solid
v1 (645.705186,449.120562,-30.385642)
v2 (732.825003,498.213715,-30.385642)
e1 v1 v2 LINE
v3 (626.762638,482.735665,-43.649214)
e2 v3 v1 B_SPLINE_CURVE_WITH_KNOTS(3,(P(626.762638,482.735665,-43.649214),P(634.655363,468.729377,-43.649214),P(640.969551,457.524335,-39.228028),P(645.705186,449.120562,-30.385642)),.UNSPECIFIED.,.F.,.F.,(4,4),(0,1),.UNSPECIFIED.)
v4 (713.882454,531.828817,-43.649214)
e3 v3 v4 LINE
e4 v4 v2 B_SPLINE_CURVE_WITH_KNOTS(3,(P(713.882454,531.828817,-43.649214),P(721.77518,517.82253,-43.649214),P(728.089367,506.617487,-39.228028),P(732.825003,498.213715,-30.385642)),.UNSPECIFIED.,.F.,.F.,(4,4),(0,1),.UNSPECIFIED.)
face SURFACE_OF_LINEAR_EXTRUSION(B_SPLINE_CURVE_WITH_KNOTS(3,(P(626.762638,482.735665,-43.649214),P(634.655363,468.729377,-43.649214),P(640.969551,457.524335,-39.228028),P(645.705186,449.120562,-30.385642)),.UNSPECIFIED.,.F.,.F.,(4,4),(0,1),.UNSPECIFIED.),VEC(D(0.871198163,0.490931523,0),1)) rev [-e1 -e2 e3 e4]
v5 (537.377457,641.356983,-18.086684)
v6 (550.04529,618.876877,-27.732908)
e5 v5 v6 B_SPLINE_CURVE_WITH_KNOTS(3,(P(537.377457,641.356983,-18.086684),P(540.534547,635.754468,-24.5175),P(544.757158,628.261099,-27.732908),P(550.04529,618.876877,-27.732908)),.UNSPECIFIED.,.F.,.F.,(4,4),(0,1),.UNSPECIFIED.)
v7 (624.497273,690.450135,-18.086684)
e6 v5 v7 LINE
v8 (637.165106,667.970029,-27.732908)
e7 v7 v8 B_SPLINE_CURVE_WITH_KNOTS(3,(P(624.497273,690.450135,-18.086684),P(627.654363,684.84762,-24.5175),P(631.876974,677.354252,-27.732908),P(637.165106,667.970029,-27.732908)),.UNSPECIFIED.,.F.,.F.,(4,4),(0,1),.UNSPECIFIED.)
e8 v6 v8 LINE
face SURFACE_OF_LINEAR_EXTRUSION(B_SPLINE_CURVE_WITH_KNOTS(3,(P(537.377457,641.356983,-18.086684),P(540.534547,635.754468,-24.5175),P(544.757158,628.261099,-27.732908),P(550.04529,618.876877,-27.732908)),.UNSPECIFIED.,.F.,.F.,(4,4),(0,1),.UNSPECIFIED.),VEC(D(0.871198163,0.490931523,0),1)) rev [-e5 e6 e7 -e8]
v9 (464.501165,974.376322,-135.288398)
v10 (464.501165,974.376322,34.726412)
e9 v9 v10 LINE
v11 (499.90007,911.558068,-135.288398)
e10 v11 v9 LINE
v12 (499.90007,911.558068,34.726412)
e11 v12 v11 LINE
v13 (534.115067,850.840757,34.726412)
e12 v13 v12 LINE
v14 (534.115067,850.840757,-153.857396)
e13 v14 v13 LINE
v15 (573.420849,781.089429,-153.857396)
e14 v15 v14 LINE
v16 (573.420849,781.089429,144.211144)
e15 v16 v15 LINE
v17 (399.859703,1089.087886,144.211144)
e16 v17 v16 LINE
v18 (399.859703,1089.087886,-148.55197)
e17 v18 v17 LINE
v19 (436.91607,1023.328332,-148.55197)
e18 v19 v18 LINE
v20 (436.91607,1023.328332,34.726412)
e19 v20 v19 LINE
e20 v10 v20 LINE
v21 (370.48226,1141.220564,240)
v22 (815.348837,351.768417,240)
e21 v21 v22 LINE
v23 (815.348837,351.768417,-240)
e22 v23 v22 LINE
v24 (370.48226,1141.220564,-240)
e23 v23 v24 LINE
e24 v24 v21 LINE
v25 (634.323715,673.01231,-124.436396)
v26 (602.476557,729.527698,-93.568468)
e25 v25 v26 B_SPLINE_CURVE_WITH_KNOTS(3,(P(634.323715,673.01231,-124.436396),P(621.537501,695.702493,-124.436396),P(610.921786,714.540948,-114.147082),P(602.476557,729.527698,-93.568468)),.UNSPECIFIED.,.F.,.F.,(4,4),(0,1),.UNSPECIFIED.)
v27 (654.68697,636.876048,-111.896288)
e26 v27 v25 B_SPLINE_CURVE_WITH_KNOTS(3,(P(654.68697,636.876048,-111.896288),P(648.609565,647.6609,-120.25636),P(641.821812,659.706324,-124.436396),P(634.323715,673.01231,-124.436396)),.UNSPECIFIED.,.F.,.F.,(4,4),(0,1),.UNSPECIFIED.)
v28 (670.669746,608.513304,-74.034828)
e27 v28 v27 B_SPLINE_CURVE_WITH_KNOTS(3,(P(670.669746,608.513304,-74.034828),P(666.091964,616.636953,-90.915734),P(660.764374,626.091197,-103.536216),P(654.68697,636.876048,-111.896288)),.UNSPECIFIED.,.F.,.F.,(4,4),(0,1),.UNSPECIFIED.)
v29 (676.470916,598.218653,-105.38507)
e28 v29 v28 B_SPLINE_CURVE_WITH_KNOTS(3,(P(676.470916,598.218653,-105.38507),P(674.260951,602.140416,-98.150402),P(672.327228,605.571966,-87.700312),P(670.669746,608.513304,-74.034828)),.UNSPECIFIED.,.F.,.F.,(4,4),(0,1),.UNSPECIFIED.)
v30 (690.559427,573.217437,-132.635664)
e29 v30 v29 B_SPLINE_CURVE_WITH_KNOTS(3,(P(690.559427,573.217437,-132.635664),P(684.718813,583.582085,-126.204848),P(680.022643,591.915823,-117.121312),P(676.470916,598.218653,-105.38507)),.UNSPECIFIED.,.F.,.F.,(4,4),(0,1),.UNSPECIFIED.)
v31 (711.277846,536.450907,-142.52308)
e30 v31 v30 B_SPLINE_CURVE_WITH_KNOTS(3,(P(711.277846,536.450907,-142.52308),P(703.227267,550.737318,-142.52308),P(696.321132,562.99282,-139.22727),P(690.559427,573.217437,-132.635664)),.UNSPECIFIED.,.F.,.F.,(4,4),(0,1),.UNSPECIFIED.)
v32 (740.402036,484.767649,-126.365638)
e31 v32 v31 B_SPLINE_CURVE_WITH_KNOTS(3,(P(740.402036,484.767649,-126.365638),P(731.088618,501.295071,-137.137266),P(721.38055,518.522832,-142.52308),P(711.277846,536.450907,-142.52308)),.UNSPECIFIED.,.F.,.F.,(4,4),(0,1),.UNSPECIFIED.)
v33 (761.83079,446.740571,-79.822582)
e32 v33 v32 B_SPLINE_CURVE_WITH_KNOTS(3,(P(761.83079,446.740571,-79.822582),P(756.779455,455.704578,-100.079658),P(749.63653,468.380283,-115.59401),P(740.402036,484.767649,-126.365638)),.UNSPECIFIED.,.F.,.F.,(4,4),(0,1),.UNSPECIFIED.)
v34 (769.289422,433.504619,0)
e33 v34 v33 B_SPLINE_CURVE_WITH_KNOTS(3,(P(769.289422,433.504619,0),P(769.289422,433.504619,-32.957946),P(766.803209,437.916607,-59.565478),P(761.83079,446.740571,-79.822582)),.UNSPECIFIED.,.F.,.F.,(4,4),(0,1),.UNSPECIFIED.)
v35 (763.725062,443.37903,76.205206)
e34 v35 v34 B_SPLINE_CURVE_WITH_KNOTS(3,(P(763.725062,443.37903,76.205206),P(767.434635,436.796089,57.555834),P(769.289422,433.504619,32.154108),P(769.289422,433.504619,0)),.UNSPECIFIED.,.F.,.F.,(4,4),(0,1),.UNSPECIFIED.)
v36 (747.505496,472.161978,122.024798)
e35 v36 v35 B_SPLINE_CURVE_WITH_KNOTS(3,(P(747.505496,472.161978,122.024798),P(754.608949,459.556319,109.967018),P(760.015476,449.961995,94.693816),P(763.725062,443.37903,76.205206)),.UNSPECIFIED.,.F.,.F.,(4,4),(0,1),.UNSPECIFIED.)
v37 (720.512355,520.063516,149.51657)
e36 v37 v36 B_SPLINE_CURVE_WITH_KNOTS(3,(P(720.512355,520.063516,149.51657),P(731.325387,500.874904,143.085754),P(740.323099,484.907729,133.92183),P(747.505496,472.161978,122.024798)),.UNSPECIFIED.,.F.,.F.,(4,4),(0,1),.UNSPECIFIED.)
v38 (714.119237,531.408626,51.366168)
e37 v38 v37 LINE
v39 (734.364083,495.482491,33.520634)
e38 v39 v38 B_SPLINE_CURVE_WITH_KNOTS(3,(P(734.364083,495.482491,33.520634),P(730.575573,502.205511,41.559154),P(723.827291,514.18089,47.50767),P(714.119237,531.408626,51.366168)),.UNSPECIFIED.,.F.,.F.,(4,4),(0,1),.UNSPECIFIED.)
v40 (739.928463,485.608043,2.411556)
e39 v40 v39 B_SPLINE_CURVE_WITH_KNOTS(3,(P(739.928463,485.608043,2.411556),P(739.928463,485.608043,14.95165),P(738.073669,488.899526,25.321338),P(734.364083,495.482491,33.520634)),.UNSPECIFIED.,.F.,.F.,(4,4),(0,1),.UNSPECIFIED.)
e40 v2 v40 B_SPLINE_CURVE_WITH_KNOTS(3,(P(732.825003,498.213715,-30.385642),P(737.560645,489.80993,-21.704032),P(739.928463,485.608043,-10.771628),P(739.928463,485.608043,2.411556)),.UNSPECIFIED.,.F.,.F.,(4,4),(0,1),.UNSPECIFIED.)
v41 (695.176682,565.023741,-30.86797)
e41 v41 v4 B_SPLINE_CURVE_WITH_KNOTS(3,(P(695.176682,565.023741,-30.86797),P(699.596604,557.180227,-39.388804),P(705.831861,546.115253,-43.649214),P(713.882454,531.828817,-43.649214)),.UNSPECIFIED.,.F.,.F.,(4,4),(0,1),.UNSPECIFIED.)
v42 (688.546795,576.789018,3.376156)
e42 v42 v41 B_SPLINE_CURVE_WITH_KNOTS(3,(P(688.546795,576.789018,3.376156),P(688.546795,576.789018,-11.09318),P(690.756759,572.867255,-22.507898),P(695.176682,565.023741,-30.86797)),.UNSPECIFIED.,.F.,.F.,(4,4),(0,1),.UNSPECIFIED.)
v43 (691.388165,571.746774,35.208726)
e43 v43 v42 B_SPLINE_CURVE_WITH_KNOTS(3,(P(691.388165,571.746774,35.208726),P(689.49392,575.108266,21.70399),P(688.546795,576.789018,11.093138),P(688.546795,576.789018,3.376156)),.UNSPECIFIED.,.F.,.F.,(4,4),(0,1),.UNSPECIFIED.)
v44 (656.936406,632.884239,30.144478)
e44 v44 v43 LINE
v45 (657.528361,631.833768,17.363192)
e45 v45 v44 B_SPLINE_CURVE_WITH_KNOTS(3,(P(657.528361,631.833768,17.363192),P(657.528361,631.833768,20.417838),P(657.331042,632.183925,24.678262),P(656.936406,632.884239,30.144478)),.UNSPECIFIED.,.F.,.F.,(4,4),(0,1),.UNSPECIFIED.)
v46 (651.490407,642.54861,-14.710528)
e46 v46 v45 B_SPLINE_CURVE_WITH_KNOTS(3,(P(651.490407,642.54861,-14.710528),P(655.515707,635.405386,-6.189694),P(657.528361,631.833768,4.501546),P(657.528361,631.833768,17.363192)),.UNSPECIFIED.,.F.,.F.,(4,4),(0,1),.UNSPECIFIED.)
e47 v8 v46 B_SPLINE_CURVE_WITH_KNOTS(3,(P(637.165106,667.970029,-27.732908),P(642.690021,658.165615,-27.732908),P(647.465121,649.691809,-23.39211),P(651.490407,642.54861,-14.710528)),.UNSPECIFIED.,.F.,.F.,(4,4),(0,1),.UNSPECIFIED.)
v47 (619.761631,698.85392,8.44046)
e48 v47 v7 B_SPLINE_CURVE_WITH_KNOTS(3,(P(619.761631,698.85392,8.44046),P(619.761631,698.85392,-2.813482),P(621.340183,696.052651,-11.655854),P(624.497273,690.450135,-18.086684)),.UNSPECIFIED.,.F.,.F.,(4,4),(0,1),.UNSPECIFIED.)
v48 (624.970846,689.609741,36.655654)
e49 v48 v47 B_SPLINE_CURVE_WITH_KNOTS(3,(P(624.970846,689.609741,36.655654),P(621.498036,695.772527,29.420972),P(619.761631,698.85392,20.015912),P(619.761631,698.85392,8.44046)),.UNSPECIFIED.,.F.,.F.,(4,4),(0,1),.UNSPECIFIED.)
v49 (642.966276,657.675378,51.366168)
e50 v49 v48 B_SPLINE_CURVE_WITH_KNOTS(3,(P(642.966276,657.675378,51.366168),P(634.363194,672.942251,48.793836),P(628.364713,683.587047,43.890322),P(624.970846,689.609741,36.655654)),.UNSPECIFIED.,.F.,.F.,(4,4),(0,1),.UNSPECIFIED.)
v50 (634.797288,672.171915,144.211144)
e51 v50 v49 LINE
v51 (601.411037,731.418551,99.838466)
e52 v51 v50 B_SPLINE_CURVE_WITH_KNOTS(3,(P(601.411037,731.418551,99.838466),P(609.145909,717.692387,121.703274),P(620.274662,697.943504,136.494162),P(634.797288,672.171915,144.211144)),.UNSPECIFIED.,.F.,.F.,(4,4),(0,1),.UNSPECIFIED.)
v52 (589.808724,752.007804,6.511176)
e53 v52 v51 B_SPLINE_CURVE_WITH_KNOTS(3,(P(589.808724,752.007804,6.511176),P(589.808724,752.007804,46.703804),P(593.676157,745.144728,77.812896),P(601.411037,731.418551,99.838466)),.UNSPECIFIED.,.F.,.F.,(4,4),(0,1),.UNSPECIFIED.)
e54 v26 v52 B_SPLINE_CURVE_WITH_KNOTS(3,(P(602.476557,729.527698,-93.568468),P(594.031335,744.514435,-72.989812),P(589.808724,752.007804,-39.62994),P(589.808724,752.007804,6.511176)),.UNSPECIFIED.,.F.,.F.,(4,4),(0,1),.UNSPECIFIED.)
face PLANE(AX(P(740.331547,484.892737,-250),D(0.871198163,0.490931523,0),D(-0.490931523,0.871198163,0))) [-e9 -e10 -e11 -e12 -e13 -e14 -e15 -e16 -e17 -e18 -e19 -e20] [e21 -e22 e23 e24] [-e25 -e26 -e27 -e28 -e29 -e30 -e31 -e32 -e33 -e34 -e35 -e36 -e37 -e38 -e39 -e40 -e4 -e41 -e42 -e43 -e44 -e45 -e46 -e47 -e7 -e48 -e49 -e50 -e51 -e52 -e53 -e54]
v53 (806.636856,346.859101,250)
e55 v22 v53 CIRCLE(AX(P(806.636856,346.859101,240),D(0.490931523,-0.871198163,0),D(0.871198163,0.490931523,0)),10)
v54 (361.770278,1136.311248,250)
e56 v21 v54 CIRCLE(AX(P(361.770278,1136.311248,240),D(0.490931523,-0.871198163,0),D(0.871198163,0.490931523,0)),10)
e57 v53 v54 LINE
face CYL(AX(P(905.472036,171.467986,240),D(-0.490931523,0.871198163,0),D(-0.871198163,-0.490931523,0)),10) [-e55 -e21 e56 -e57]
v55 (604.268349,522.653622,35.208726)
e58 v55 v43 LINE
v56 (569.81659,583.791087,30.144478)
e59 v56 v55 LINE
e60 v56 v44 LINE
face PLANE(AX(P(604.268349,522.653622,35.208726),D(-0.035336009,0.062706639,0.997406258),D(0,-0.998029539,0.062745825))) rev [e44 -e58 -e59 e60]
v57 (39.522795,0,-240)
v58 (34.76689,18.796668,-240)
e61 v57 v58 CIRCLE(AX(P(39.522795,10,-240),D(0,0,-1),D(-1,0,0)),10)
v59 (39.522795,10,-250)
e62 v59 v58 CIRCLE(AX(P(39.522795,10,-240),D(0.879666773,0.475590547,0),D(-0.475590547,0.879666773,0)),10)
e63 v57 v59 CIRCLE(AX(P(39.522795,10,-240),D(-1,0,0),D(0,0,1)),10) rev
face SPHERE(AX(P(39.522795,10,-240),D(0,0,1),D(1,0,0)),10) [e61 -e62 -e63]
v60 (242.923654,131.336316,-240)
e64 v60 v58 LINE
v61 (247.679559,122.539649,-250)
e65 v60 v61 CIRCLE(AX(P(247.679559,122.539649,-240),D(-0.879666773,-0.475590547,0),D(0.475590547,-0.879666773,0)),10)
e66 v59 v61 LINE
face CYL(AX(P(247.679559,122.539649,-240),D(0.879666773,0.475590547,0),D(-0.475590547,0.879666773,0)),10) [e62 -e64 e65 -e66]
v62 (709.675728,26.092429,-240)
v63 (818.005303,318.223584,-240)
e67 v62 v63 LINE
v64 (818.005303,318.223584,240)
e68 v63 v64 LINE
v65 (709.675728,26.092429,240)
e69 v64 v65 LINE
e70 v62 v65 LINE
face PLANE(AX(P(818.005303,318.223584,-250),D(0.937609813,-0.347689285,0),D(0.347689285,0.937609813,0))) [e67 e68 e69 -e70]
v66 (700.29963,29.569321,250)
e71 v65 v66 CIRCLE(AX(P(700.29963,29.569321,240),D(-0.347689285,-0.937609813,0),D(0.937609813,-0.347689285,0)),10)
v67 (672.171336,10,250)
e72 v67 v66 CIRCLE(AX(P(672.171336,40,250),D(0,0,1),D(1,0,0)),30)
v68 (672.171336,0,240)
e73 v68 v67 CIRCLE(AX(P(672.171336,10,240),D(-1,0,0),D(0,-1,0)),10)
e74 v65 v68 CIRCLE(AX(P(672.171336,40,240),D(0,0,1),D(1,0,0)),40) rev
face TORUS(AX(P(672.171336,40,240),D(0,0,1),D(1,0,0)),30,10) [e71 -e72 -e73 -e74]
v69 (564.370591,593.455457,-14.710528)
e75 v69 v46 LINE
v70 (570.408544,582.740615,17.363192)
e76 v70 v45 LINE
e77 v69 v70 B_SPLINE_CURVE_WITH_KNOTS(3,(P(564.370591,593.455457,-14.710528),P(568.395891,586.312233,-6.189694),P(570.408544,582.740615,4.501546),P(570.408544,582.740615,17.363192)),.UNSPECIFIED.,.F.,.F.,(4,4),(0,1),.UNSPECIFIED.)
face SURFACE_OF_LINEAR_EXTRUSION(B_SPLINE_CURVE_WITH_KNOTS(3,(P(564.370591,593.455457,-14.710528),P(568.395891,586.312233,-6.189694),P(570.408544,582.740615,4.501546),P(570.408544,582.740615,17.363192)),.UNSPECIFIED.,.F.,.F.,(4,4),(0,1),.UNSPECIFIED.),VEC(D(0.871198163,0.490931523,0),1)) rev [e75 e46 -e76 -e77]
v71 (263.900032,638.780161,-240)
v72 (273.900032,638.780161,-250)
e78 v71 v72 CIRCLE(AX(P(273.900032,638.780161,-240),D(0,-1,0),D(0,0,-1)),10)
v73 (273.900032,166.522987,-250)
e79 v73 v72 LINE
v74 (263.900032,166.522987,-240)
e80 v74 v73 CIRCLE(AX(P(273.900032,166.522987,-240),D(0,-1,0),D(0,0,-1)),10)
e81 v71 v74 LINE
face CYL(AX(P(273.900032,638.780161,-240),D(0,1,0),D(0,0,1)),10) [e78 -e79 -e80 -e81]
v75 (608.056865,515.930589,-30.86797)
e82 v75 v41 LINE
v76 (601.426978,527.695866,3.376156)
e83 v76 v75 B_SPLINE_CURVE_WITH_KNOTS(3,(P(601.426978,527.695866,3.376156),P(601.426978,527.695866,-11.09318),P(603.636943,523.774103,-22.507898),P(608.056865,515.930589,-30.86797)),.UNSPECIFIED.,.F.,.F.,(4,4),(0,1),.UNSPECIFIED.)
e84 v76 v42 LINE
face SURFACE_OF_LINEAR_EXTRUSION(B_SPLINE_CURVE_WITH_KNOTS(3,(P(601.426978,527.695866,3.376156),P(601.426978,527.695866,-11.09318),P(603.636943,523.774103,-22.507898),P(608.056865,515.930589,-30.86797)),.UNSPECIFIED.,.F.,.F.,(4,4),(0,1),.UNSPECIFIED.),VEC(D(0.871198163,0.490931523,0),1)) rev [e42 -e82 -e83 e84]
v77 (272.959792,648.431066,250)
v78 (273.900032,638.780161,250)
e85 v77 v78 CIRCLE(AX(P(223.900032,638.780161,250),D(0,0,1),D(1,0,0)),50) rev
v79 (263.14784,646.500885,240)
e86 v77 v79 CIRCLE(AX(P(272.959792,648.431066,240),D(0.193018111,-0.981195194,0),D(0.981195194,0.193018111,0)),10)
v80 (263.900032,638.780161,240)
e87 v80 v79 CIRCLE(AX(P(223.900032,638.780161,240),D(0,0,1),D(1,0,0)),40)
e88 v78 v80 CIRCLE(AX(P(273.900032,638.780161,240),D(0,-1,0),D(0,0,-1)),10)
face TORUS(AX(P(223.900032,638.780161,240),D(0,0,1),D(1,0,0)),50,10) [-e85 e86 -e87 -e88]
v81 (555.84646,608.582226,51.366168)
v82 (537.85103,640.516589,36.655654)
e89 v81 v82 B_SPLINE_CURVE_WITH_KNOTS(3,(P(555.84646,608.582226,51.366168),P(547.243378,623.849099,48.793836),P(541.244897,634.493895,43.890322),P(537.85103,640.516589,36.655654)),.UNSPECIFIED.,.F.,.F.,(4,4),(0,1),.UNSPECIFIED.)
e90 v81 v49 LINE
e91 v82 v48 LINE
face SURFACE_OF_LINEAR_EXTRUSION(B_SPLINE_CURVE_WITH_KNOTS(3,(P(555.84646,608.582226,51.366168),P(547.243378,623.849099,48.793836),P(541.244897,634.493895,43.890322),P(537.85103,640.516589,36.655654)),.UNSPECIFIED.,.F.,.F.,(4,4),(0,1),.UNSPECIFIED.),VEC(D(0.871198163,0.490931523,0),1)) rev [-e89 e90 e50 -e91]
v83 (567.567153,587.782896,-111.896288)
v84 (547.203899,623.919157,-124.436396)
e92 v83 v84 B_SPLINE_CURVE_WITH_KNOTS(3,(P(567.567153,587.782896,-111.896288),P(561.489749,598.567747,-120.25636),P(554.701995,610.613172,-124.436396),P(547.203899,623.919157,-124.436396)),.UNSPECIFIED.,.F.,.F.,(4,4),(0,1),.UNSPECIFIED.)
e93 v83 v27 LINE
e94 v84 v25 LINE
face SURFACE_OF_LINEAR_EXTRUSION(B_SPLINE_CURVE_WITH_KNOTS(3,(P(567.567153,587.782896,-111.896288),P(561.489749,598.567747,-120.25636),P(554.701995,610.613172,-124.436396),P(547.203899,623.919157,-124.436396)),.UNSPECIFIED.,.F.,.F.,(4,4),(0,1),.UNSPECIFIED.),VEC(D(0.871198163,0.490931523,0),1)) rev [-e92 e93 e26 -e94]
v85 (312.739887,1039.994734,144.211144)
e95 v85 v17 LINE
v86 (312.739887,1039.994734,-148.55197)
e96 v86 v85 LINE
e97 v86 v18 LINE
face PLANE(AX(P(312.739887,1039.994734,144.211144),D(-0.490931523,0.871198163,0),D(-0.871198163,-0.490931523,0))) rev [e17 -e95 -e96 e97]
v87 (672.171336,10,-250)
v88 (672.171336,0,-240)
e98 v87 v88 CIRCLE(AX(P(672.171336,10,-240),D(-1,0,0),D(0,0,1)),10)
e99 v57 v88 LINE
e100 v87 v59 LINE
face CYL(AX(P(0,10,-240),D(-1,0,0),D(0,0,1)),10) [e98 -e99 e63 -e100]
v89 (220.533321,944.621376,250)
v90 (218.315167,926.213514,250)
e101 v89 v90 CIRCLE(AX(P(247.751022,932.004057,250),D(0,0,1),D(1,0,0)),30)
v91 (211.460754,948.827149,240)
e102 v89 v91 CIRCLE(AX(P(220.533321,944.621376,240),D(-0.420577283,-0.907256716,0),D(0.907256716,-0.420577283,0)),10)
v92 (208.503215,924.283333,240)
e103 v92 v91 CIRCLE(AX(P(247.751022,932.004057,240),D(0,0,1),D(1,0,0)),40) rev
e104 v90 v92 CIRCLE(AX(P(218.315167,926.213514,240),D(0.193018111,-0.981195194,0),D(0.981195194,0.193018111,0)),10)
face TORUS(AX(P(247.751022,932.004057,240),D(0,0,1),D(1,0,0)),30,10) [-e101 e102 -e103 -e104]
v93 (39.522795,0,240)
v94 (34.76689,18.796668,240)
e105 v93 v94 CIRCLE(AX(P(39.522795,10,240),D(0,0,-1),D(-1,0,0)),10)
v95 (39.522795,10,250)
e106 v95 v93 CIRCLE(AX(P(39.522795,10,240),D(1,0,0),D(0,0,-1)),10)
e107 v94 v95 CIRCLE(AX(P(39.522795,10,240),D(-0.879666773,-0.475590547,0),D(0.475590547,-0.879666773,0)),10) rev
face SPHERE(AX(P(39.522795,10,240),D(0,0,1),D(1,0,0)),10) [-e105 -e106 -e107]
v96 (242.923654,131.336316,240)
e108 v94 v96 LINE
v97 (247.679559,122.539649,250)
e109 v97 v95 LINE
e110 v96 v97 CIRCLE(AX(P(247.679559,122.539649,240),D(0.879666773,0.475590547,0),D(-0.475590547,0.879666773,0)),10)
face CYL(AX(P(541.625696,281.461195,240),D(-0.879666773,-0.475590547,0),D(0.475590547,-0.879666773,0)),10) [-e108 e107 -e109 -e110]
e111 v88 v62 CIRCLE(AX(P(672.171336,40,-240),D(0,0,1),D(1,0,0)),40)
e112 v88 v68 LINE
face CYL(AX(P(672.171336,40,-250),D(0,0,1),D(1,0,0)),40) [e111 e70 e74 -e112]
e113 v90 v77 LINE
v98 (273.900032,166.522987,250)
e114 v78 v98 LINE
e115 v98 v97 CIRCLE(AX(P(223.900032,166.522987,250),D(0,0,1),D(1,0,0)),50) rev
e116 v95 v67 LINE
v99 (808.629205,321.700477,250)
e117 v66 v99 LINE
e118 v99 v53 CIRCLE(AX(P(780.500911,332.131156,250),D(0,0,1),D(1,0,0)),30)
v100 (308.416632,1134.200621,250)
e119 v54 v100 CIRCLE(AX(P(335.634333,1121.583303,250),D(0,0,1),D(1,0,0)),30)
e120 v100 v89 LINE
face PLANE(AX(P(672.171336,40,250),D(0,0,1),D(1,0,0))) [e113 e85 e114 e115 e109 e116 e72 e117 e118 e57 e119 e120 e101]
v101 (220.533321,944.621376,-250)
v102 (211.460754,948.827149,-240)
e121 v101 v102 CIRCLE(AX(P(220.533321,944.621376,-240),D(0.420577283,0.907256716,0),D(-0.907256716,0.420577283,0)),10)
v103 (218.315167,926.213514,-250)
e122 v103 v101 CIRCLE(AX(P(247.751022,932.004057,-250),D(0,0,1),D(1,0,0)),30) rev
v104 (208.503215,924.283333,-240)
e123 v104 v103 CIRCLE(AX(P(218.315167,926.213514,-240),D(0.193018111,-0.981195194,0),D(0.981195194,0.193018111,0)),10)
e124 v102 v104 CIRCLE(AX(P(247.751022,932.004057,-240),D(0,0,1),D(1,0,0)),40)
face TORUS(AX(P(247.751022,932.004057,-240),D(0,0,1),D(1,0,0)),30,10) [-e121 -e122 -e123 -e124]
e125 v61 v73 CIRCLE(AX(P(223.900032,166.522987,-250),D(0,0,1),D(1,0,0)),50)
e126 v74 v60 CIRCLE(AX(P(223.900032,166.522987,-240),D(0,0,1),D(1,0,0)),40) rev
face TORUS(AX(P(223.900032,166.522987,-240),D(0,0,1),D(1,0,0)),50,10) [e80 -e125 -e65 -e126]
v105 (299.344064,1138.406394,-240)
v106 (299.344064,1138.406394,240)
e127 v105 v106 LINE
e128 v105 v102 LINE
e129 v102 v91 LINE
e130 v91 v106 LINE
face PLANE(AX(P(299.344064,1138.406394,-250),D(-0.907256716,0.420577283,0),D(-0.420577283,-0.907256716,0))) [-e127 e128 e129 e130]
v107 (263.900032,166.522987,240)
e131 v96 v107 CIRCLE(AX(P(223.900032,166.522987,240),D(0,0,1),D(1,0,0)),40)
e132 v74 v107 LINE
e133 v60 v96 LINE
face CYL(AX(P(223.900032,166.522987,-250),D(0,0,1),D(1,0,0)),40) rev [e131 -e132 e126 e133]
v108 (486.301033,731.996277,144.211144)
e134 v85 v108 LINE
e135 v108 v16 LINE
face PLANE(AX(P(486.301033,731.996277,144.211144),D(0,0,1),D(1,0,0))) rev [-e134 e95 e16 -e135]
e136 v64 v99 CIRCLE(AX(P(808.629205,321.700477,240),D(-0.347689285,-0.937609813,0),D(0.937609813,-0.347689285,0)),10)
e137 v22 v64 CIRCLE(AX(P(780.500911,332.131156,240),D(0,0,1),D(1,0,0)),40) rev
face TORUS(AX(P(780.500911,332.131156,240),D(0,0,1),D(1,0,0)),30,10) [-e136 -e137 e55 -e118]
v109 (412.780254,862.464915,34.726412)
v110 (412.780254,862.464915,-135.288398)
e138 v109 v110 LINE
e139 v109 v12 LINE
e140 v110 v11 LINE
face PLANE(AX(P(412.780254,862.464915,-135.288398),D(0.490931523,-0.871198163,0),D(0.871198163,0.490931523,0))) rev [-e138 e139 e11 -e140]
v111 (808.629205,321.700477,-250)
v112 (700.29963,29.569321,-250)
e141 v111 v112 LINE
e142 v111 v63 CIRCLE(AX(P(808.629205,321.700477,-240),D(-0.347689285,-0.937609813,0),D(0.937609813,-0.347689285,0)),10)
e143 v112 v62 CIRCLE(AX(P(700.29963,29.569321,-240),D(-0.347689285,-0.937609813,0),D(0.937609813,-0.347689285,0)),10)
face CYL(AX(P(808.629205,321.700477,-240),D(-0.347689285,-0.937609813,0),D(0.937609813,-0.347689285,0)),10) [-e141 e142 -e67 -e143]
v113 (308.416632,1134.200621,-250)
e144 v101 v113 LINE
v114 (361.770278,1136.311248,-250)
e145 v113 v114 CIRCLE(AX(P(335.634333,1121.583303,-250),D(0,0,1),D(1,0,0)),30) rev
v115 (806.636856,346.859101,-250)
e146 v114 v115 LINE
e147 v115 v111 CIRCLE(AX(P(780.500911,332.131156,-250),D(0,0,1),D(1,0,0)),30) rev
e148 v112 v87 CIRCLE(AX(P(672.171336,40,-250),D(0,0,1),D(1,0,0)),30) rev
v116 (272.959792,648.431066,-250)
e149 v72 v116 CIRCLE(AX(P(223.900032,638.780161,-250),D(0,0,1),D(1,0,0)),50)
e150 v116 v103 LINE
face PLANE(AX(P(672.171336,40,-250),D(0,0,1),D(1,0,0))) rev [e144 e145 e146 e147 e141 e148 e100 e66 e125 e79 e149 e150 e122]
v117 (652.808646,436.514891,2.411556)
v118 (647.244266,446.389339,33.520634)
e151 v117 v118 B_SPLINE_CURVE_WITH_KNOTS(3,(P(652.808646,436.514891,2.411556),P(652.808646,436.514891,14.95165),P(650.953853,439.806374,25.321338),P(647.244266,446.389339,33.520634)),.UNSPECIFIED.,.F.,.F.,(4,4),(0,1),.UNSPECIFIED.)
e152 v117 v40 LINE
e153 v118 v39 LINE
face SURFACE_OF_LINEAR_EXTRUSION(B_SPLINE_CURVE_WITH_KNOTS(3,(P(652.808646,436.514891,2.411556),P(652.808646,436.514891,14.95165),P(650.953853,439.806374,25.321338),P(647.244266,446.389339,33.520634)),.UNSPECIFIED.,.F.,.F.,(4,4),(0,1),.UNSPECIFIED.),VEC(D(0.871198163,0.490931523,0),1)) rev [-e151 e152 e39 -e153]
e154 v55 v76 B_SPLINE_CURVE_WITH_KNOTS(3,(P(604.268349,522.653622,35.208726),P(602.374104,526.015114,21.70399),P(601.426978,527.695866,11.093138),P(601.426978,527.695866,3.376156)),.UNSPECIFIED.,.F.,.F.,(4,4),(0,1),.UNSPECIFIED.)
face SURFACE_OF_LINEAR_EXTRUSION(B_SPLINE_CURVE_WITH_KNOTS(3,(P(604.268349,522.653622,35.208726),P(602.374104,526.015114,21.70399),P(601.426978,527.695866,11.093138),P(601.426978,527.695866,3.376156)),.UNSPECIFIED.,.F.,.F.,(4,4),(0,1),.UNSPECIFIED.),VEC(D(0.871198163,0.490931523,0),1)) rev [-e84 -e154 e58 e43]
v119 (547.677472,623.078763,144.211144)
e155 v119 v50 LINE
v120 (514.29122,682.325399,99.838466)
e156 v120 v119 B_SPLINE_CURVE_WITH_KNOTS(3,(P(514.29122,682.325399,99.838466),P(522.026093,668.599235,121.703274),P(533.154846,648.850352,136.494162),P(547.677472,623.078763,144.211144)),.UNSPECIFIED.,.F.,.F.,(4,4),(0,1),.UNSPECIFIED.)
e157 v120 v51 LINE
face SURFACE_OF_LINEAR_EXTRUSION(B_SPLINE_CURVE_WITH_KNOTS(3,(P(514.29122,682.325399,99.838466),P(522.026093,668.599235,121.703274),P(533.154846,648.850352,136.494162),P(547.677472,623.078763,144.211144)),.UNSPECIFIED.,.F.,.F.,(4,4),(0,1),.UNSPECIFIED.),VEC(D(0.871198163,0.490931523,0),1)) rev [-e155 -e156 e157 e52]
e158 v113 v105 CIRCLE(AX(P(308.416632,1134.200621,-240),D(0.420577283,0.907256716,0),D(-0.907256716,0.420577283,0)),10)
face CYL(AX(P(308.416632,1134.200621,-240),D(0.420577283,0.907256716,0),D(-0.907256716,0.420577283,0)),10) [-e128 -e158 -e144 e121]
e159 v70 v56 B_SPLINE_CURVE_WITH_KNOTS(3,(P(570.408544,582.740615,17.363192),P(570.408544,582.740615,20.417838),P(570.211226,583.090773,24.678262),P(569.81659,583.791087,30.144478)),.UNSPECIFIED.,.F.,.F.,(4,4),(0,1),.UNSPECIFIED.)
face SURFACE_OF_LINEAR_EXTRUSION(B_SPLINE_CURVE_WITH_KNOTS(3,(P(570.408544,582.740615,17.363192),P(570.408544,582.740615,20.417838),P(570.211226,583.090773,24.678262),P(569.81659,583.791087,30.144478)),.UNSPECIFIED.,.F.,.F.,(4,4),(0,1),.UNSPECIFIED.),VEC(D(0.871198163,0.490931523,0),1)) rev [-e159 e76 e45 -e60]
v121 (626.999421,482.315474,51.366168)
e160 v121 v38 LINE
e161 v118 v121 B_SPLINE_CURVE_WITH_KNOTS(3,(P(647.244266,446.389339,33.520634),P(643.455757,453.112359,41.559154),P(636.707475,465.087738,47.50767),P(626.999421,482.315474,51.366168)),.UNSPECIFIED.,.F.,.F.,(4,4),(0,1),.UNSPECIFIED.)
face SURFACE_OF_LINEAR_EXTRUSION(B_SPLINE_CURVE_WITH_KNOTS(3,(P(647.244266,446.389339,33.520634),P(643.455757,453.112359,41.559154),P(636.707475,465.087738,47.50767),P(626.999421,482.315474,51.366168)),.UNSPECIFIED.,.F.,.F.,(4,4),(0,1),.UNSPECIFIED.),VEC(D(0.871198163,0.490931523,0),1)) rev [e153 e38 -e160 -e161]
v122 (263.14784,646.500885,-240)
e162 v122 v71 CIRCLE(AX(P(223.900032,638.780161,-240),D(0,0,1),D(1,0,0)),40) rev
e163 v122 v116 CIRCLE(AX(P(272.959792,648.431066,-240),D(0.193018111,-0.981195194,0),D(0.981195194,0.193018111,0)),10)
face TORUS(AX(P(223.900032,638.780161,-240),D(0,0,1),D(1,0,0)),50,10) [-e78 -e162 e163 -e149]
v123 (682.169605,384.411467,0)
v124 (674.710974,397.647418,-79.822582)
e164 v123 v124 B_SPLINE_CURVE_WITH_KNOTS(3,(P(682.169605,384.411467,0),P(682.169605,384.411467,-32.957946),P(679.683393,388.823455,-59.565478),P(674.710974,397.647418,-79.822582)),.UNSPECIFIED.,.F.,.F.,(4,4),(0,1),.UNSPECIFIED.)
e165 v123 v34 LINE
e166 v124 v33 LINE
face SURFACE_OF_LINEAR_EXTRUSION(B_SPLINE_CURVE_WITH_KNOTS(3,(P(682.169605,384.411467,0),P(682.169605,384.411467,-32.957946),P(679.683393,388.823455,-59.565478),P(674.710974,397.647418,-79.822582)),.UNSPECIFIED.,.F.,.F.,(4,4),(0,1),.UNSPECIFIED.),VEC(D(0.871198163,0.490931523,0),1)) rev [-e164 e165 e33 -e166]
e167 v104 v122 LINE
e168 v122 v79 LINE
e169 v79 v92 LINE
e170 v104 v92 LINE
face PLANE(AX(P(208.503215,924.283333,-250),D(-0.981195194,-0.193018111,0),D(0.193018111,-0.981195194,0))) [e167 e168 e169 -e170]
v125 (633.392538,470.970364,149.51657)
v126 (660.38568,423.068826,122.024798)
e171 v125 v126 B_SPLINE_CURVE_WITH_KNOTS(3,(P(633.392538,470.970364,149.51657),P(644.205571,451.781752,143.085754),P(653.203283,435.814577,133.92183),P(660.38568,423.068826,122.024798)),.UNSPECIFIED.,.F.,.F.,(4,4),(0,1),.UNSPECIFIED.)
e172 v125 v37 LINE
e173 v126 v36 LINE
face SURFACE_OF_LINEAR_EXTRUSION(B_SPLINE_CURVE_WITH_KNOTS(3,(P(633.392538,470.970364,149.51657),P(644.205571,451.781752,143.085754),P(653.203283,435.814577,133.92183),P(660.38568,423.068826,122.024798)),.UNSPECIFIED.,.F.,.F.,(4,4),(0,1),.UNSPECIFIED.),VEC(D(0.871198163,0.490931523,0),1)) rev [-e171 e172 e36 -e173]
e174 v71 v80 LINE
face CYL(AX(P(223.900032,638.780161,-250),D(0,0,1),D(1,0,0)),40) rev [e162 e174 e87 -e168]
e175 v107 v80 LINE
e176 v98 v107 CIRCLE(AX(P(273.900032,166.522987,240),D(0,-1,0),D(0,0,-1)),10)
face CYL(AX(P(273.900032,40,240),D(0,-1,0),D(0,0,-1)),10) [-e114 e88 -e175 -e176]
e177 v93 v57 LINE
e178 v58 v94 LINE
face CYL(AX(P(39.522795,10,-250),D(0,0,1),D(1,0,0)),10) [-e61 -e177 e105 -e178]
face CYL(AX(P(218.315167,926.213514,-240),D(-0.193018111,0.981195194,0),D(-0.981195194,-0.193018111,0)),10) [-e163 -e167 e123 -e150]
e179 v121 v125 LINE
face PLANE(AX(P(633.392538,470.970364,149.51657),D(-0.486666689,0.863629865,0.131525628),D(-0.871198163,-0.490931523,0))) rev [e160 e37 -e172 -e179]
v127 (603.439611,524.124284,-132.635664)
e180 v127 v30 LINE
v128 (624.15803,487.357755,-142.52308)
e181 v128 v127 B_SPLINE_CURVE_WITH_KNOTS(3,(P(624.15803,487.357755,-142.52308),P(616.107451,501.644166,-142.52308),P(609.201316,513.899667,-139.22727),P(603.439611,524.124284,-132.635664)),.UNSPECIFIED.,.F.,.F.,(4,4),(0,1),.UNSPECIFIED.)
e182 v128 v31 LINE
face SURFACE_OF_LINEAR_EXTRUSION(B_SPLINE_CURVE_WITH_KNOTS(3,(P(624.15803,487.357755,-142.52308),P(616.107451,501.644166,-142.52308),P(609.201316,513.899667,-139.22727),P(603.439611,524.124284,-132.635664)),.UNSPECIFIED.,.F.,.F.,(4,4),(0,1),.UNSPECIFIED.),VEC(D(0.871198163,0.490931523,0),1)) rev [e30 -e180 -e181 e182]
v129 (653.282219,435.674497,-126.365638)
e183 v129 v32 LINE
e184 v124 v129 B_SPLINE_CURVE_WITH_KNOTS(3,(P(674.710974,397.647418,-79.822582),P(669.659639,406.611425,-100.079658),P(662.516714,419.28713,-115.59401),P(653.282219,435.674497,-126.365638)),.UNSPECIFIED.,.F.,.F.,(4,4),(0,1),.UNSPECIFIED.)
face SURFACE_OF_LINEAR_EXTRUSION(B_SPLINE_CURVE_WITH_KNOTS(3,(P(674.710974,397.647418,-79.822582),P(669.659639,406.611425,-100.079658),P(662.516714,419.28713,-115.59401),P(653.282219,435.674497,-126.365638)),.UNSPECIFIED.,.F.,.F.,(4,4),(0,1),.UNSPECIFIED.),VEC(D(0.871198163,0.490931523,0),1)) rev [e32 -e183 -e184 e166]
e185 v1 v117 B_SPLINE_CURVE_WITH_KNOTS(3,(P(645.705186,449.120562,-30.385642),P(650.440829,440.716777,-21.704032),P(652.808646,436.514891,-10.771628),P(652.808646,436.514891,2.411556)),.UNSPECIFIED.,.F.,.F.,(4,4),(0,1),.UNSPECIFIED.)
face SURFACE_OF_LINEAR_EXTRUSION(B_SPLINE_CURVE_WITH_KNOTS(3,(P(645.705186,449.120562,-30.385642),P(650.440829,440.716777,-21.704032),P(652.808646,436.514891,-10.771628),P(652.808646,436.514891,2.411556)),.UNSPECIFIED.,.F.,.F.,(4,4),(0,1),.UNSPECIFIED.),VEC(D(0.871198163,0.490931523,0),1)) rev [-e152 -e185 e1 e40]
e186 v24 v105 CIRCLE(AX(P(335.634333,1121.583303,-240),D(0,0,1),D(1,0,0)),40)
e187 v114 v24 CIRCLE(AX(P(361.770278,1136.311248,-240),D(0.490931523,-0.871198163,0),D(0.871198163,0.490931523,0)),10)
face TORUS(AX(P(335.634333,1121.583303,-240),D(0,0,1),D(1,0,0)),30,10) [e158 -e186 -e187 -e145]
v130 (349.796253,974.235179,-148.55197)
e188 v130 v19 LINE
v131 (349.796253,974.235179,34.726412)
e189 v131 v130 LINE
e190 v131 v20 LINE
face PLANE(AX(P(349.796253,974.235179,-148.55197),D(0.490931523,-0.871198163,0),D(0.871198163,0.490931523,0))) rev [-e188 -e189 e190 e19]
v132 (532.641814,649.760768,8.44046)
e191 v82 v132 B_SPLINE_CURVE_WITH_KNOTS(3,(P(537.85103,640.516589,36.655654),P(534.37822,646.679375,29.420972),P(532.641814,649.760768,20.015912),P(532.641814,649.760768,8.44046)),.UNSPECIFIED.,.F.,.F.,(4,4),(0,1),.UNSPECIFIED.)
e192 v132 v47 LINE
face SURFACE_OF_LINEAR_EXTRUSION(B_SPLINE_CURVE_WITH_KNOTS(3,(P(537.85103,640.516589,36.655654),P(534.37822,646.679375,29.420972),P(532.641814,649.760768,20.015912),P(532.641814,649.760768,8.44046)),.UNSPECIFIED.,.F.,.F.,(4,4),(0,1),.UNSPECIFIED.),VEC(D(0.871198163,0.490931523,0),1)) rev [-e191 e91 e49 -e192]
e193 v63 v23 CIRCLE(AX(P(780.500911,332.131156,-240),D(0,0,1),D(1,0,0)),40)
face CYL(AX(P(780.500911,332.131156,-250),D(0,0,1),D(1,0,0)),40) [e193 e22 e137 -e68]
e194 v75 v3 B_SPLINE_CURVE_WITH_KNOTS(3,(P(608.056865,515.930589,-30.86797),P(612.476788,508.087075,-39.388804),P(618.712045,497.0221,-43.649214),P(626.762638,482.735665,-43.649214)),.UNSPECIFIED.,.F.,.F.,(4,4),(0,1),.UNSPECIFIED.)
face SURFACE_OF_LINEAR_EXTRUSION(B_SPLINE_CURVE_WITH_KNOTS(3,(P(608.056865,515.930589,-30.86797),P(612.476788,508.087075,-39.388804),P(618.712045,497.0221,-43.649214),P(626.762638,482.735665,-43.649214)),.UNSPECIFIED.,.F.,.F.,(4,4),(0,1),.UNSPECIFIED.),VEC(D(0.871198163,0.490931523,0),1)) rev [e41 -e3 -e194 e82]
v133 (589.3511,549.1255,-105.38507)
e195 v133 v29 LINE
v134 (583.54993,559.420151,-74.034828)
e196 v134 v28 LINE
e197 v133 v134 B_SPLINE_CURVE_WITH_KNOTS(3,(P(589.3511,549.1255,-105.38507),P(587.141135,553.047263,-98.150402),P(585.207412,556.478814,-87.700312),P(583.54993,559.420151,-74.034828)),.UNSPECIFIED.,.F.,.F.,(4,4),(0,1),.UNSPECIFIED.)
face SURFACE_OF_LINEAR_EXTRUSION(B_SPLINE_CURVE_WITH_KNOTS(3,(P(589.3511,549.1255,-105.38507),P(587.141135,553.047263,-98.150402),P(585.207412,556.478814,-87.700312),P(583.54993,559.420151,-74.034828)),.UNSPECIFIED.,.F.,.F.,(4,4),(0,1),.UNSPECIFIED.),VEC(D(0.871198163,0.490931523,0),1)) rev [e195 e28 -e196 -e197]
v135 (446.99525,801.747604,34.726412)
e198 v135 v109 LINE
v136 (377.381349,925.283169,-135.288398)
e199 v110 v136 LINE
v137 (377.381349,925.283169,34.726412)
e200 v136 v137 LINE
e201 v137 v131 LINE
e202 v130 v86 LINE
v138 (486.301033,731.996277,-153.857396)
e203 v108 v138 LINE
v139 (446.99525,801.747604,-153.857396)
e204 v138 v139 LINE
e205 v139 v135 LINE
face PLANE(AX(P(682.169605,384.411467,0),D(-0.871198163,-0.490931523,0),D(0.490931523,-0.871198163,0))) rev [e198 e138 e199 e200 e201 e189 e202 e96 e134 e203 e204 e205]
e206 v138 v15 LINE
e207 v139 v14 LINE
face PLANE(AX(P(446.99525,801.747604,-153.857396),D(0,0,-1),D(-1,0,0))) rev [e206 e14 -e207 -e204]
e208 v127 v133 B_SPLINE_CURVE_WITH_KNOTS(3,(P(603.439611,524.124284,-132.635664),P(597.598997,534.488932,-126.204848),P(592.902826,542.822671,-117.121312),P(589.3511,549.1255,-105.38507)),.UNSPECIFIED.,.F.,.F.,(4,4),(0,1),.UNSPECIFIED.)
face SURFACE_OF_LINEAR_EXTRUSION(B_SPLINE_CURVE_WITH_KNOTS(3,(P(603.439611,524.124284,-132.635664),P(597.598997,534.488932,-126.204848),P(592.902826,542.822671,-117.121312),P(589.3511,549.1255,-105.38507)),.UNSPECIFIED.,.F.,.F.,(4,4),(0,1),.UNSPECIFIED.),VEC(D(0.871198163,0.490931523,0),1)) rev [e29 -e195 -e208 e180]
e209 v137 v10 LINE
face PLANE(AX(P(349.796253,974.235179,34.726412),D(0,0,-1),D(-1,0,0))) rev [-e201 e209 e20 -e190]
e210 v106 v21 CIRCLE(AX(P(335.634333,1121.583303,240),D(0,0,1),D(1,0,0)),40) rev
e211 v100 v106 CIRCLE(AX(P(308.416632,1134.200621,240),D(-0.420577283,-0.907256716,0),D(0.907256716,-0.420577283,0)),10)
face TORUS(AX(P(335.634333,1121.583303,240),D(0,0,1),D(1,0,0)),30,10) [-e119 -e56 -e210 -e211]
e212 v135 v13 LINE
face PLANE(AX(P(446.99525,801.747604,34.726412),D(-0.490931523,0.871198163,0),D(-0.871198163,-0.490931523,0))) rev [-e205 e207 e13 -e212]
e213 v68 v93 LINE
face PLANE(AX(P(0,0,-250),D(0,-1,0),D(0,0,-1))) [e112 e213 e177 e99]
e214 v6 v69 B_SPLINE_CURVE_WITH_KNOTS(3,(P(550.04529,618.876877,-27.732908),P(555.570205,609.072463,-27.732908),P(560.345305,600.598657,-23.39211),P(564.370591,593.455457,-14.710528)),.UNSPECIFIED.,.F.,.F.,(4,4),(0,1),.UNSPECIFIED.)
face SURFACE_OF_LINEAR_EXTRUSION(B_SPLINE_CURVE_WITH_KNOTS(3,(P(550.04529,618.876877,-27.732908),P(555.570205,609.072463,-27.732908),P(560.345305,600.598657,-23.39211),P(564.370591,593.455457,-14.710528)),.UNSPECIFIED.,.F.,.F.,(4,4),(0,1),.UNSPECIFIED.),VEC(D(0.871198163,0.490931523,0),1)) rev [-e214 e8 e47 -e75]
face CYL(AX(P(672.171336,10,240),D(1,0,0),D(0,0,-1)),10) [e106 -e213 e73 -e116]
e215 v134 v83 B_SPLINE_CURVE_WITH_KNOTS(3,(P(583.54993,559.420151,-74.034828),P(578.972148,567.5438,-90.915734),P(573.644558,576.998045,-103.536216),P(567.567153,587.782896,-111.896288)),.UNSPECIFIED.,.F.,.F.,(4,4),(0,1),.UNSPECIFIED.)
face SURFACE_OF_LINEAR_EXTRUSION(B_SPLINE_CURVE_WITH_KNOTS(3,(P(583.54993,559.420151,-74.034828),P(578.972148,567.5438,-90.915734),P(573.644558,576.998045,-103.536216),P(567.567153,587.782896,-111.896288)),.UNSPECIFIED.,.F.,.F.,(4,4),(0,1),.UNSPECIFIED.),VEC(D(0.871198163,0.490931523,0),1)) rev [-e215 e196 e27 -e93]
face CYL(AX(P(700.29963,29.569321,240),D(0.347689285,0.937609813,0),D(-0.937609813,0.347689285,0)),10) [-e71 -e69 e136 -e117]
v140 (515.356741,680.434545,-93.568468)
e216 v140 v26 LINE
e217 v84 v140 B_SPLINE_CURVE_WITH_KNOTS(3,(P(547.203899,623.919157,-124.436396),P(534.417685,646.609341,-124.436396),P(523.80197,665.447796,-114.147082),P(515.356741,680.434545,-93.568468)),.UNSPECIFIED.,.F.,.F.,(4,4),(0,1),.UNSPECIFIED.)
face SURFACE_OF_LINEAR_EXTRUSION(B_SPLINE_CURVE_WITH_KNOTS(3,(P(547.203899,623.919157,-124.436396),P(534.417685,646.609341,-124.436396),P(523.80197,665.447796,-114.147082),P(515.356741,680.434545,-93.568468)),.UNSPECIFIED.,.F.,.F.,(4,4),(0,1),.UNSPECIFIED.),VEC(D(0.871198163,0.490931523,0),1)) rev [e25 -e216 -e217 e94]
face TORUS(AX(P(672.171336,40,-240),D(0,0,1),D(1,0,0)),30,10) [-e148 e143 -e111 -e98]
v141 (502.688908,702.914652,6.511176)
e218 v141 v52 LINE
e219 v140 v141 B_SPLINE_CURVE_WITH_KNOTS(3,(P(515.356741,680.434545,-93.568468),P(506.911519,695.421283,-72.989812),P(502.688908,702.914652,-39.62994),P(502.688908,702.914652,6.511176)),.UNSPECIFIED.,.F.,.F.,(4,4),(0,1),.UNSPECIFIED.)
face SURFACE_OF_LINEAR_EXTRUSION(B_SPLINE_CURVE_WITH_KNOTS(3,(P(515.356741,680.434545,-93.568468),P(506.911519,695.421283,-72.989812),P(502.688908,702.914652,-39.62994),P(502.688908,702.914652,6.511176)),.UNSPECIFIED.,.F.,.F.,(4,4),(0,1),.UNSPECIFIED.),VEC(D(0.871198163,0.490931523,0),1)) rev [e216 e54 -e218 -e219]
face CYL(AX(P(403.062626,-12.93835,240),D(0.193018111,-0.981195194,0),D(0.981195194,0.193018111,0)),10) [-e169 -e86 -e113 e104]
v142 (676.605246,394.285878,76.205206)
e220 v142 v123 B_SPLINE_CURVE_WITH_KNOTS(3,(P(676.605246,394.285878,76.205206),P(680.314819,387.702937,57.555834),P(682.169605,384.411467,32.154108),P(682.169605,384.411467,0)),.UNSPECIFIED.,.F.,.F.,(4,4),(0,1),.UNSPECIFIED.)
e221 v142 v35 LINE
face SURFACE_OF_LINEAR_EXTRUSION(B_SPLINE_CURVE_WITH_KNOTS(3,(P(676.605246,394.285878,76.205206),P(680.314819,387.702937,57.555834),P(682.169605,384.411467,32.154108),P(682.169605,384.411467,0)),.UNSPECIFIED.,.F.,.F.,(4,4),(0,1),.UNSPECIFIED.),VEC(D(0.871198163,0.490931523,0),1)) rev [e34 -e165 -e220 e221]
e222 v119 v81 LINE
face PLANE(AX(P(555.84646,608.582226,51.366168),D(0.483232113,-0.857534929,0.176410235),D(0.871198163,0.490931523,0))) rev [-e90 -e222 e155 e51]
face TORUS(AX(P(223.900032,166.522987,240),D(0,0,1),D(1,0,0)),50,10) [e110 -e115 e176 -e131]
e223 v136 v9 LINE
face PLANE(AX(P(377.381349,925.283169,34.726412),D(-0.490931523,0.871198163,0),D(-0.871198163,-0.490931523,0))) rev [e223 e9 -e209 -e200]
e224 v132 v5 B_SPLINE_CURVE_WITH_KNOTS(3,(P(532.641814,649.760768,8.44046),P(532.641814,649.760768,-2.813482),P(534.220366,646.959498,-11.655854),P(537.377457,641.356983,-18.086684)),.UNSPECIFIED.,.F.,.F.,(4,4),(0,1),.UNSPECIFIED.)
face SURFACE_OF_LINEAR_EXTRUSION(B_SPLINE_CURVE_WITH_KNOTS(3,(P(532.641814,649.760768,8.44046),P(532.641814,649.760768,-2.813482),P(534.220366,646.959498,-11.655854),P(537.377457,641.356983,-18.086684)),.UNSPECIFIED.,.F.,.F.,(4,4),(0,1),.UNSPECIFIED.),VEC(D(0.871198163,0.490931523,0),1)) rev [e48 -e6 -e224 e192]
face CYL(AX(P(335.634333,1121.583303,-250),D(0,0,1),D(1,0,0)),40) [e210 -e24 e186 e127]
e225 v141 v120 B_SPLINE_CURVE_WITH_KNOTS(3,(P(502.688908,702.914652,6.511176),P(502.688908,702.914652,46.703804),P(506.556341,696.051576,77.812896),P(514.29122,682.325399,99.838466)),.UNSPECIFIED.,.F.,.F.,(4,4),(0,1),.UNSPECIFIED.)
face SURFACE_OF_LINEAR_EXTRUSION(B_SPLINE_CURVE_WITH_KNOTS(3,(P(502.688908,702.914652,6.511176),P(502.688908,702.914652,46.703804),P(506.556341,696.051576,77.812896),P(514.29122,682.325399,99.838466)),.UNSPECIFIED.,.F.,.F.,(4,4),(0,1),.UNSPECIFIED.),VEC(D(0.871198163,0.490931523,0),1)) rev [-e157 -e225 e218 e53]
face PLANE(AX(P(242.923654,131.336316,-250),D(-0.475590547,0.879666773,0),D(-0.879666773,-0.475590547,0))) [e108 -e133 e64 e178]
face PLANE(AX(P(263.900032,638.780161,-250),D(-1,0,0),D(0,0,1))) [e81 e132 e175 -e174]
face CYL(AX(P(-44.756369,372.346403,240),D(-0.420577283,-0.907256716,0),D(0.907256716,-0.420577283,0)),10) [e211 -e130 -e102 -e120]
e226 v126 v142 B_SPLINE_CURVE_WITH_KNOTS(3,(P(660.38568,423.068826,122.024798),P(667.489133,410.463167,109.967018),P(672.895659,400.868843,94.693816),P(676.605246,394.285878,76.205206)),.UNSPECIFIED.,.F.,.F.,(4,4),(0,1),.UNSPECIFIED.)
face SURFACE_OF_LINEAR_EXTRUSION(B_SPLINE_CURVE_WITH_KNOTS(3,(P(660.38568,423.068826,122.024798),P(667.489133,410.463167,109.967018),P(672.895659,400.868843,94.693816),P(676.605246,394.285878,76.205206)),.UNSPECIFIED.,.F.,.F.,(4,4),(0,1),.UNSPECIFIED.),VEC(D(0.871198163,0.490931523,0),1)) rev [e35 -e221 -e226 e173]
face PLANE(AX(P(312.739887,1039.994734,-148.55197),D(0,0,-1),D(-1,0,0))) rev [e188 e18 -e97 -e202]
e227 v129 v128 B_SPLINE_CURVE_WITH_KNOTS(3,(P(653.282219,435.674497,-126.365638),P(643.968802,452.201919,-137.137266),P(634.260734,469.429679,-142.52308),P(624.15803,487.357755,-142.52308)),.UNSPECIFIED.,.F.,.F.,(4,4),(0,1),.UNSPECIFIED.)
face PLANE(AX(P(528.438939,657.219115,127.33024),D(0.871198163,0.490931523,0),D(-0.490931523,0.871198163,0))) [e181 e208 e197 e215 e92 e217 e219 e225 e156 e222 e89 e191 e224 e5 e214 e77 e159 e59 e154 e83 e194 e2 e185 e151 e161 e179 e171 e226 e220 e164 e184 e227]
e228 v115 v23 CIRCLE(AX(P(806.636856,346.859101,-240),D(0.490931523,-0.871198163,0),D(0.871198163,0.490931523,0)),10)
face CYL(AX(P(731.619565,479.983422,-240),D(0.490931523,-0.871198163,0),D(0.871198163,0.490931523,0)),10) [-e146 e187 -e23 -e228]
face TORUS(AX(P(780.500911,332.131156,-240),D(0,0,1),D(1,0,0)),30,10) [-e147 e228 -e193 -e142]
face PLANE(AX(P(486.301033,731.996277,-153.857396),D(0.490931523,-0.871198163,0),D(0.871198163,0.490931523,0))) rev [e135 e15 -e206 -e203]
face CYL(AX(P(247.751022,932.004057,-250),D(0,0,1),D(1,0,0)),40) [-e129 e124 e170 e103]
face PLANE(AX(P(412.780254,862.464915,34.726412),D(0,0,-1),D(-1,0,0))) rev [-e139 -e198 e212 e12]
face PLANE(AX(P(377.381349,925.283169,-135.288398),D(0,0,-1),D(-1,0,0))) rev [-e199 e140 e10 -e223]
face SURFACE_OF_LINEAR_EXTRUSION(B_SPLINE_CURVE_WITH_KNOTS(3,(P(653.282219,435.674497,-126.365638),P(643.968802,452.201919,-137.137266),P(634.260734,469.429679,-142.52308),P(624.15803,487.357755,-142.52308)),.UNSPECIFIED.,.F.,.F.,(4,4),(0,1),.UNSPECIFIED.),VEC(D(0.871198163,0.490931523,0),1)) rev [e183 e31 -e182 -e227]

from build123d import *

# Parameters (mm, degrees)
BOSS_EXTRUDE4_DEPTH      = 250
BOSS_EXTRUDE4_DEPTH_BACK = 250
FILLET1_R                = 10
FILLET2_R                = 10
FILLET3_R                = 10
CUT_EXTRUDE1_DEPTH       = 100


with BuildPart() as part:
    # Sketch5 → Boss-Extrude4 (new, two sides: drawn at the far end of the back side and taken through both)
    with BuildSketch(Plane.XY.offset(-BOSS_EXTRUDE4_DEPTH_BACK)):
        with BuildLine():
            Line((0, 0), (672.171335821, 0))
            ThreePointArc((672.171335821, 0), (695.015340994, 7.164783727), (709.67572834, 26.092428616))
            Line((709.67572834, 26.092428616), (818.005303321, 318.223584322))
            ThreePointArc((818.005303321, 318.223584322), (820.376071762, 335.288930001), (815.348837324, 351.768416645))
            Line((815.348837324, 351.768416645), (740.331547095, 484.892737084))
            Line((740.331547095, 484.892737084), (370.482259657, 1141.220563707))
            ThreePointArc((370.482259657, 1141.220563707), (334.053202103, 1161.55204086), (299.344064495, 1138.4063941))
            Line((299.344064495, 1138.4063941), (211.46075369, 948.827148814))
            ThreePointArc((211.46075369, 948.827148814), (208.038304344, 936.789455071), (208.503214572, 924.283333024))
            Line((208.503214572, 924.283333024), (263.147839607, 646.500885254))
            ThreePointArc((263.147839607, 646.500885254), (263.711539672, 642.658800356), (263.900031848, 638.780160797))
            Line((263.900031848, 638.780160797), (263.900031848, 166.522987154))
            ThreePointArc((263.900031848, 166.522987154), (258.258035835, 146.04061517), (242.923653745, 131.336316241))
            Line((242.923653745, 131.336316241), (0, 0))
        make_face()
    extrude(amount=BOSS_EXTRUDE4_DEPTH + BOSS_EXTRUDE4_DEPTH_BACK)

    # Fillet1
    fillet1_edges = [part.edges().sort_by_distance(p)[0] for p in [
        (121.461826872, 65.66815812, 250),
        (336.085667911, 0, 250),
        (695.015340994, 7.164783727, 250),
        (763.840515831, 172.158006469, 250),
        (820.376071762, 335.288930001, 250),
        (592.91554849, 746.494490176, 250),
        (334.053202103, 1161.55204086, 250),
        (255.402409092, 1043.616771457, 250),
        (208.038304344, 936.789455071, 250),
        (235.825527089, 785.392109139, 250),
        (263.711539672, 642.658800356, 250),
        (263.900031848, 402.651573975, 250),
        (258.258035835, 146.04061517, 250),
    ]]
    fillet(fillet1_edges, radius=FILLET1_R)

    # Fillet2
    fillet2_edges = [part.edges().sort_by_distance(p)[0] for p in [
        (695.015340994, 7.164783727, -250),
        (763.840515831, 172.158006469, -250),
        (820.376071762, 335.288930001, -250),
        (592.91554849, 746.494490176, -250),
        (334.053202103, 1161.55204086, -250),
        (255.402409092, 1043.616771457, -250),
        (208.038304344, 936.789455071, -250),
        (235.825527089, 785.392109139, -250),
        (263.711539672, 642.658800356, -250),
        (121.461826872, 65.66815812, -250),
        (263.900031848, 402.651573975, -250),
        (258.258035835, 146.04061517, -250),
        (336.085667911, 0, -250),
    ]]
    fillet(fillet2_edges, radius=FILLET2_R)

    # Fillet3
    # the kernel refuses this fillet: 10 mm, written as the material it takes off along each edge
    with BuildSketch(Plane(origin=(39.52279504, 10, 240), x_dir=(0, -1, 0), z_dir=(0, 0, 1))) as fillet3_piece_1_section:
        Polygon((0, 0), (FILLET3_R, 0), (FILLET3_R, -FILLET3_R * 3.95227950403), (-FILLET3_R * 0.879666772827, -FILLET3_R * 0.475590547408), align=None)
    fillet3_piece_1 = extrude(amount=FILLET3_R, mode=Mode.PRIVATE)
    fillet3_piece_1 = fillet3_piece_1 - Plane(origin=(39.52279504, 10, 240), x_dir=(0.9694500432790283, 0.24528883706008733, 0), z_dir=(0, 0, 1)) * Sphere(FILLET3_R, mode=Mode.PRIVATE)
    add(fillet3_piece_1, mode=Mode.SUBTRACT)
    with BuildSketch(Plane(origin=(39.52279504, 10, -240), x_dir=(0, -1, 0), z_dir=(0, 0, -1))) as fillet3_piece_2_section:
        Polygon((0, 0), (FILLET3_R, 0), (FILLET3_R, FILLET3_R * 3.95227950403), (-FILLET3_R * 0.879666772827, FILLET3_R * 0.475590547408), align=None)
    fillet3_piece_2 = extrude(amount=FILLET3_R, mode=Mode.PRIVATE)
    fillet3_piece_2 = fillet3_piece_2 - Plane(origin=(39.52279504, 10, -240), x_dir=(0.9694500432790283, 0.24528883706008733, 0), z_dir=(0, 0, -1)) * Sphere(FILLET3_R, mode=Mode.PRIVATE)
    add(fillet3_piece_2, mode=Mode.SUBTRACT)
    with BuildSketch(Plane(origin=(0, 0, -240), x_dir=(1, 0, 0), z_dir=(0, 0, 1))) as fillet3_piece_3:
        with BuildLine():
            CenterArc((FILLET3_R * 3.95227950403, FILLET3_R), FILLET3_R, 118.397807475, 151.602192525)
            Line((FILLET3_R * 3.47668895662, FILLET3_R * 1.87966677283), (0, 0))
            Line((0, 0), (FILLET3_R * 3.95227950403, 0))
        make_face()
    extrude(amount=480, mode=Mode.SUBTRACT)

    # Sketch11 → Cut-Extrude1 (cut)
    with BuildSketch(Plane(origin=(769.289421626, 433.504619004, 0), x_dir=(0, 0, -1), z_dir=(0.8711981630321445, 0.4909315234627098, 0))):
        Polygon((-144.211144, 752.50763293), (148.55197, 752.50763293), (148.55197, 677.02589093), (-34.726412, 677.02589093), (-34.726412, 620.83659693), (135.288398, 620.83659693), (135.288398, 548.73101093), (-34.726412, 548.73101093), (-34.726412, 479.03698093), (153.857396, 479.03698093), (153.857396, 398.97330493), (-144.211144, 398.97330493), align=None)
        with BuildLine():
            Line((-51.366168, 257.313168), (-144.211144, 273.952938))
            add(Edge.make_bspline(
                [(-144.211144, 273.952938), (-136.494162, 303.534714), (-121.703274, 326.20336), (-99.838466, 341.958862)],
                knots=[0, 0, 0, 0, 1, 1, 1, 1], degree=3))
            add(Edge.make_bspline(
                [(-99.838466, 341.958862), (-77.812896, 357.714378), (-46.703804, 365.592122), (-6.511176, 365.592122)],
                knots=[0, 0, 0, 0, 1, 1, 1, 1], degree=3))
            add(Edge.make_bspline(
                [(-6.511176, 365.592122), (39.62994, 365.592122), (72.989812, 356.9909), (93.568468, 339.788456)],
                knots=[0, 0, 0, 0, 1, 1, 1, 1], degree=3))
            add(Edge.make_bspline(
                [(93.568468, 339.788456), (114.147082, 322.585998), (124.436396, 300.962382), (124.436396, 274.91758)],
                knots=[0, 0, 0, 0, 1, 1, 1, 1], degree=3))
            add(Edge.make_bspline(
                [(124.436396, 274.91758), (124.436396, 259.644378), (120.25636, 245.818104), (111.896288, 233.438772)],
                knots=[0, 0, 0, 0, 1, 1, 1, 1], degree=3))
            add(Edge.make_bspline(
                [(111.896288, 233.438772), (103.536216, 221.05944), (90.915734, 210.207438), (74.034828, 200.882752)],
                knots=[0, 0, 0, 0, 1, 1, 1, 1], degree=3))
            add(Edge.make_bspline(
                [(74.034828, 200.882752), (87.700312, 197.506554), (98.150402, 193.567668), (105.38507, 189.066094)],
                knots=[0, 0, 0, 0, 1, 1, 1, 1], degree=3))
            add(Edge.make_bspline(
                [(105.38507, 189.066094), (117.121312, 181.831426), (126.204848, 172.26559), (132.635664, 160.368586)],
                knots=[0, 0, 0, 0, 1, 1, 1, 1], degree=3))
            add(Edge.make_bspline(
                [(132.635664, 160.368586), (139.22727, 148.632316), (142.52308, 134.564906), (142.52308, 118.166328)],
                knots=[0, 0, 0, 0, 1, 1, 1, 1], degree=3))
            add(Edge.make_bspline(
                [(142.52308, 118.166328), (142.52308, 97.587686), (137.137266, 77.812896), (126.365638, 58.841986)],
                knots=[0, 0, 0, 0, 1, 1, 1, 1], degree=3))
            add(Edge.make_bspline(
                [(126.365638, 58.841986), (115.59401, 40.031838), (100.079658, 25.4821), (79.822582, 15.192814)],
                knots=[0, 0, 0, 0, 1, 1, 1, 1], degree=3))
            add(Edge.make_bspline(
                [(79.822582, 15.192814), (59.565478, 5.064276), (32.957946, 0), (0, 0)],
                knots=[0, 0, 0, 0, 1, 1, 1, 1], degree=3))
            add(Edge.make_bspline(
                [(0, 0), (-32.154108, 0), (-57.555834, 3.778096), (-76.205206, 11.334288)],
                knots=[0, 0, 0, 0, 1, 1, 1, 1], degree=3))
            add(Edge.make_bspline(
                [(-76.205206, 11.334288), (-94.693816, 18.890508), (-109.967018, 29.9033), (-122.024798, 44.372636)],
                knots=[0, 0, 0, 0, 1, 1, 1, 1], degree=3))
            add(Edge.make_bspline(
                [(-122.024798, 44.372636), (-133.92183, 59.002776), (-143.085754, 77.33061), (-149.51657, 99.356152)],
                knots=[0, 0, 0, 0, 1, 1, 1, 1], degree=3))
            Line((-149.51657, 99.356152), (-51.366168, 112.378574))
            add(Edge.make_bspline(
                [(-51.366168, 112.378574), (-47.50767, 92.603812), (-41.559154, 78.85794), (-33.520634, 71.140958)],
                knots=[0, 0, 0, 0, 1, 1, 1, 1], degree=3))
            add(Edge.make_bspline(
                [(-33.520634, 71.140958), (-25.321338, 63.584738), (-14.95165, 59.806628), (-2.411556, 59.806628)],
                knots=[0, 0, 0, 0, 1, 1, 1, 1], degree=3))
            add(Edge.make_bspline(
                [(-2.411556, 59.806628), (10.771628, 59.806628), (21.704032, 64.62974), (30.385642, 74.275978)],
                knots=[0, 0, 0, 0, 1, 1, 1, 1], degree=3))
            add(Edge.make_bspline(
                [(30.385642, 74.275978), (39.228028, 83.922202), (43.649214, 96.783848), (43.649214, 112.860888)],
                knots=[0, 0, 0, 0, 1, 1, 1, 1], degree=3))
            add(Edge.make_bspline(
                [(43.649214, 112.860888), (43.649214, 129.259494), (39.388804, 141.960364), (30.86797, 150.963498)],
                knots=[0, 0, 0, 0, 1, 1, 1, 1], degree=3))
            add(Edge.make_bspline(
                [(30.86797, 150.963498), (22.507898, 159.966632), (11.09318, 164.468206), (-3.376156, 164.468206)],
                knots=[0, 0, 0, 0, 1, 1, 1, 1], degree=3))
            add(Edge.make_bspline(
                [(-3.376156, 164.468206), (-11.093138, 164.468206), (-21.70399, 162.538964), (-35.208726, 158.680494)],
                knots=[0, 0, 0, 0, 1, 1, 1, 1], degree=3))
            Line((-35.208726, 158.680494), (-30.144478, 228.856796))
            add(Edge.make_bspline(
                [(-30.144478, 228.856796), (-24.678262, 228.052944), (-20.417838, 227.651018), (-17.363192, 227.651018)],
                knots=[0, 0, 0, 0, 1, 1, 1, 1], degree=3))
            add(Edge.make_bspline(
                [(-17.363192, 227.651018), (-4.501546, 227.651018), (6.189694, 231.75068), (14.710528, 239.94999)],
                knots=[0, 0, 0, 0, 1, 1, 1, 1], degree=3))
            add(Edge.make_bspline(
                [(14.710528, 239.94999), (23.39211, 248.149272), (27.732908, 257.875884), (27.732908, 269.129826)],
                knots=[0, 0, 0, 0, 1, 1, 1, 1], degree=3))
            add(Edge.make_bspline(
                [(27.732908, 269.129826), (27.732908, 279.901454), (24.5175, 288.502676), (18.086684, 294.933492)],
                knots=[0, 0, 0, 0, 1, 1, 1, 1], degree=3))
            add(Edge.make_bspline(
                [(18.086684, 294.933492), (11.655854, 301.364308), (2.813482, 304.57973), (-8.44046, 304.57973)],
                knots=[0, 0, 0, 0, 1, 1, 1, 1], degree=3))
            add(Edge.make_bspline(
                [(-8.44046, 304.57973), (-20.015912, 304.57973), (-29.420972, 301.04277), (-36.655654, 293.96885)],
                knots=[0, 0, 0, 0, 1, 1, 1, 1], degree=3))
            add(Edge.make_bspline(
                [(-36.655654, 293.96885), (-43.890322, 287.055734), (-48.793836, 274.837164), (-51.366168, 257.313168)],
                knots=[0, 0, 0, 0, 1, 1, 1, 1], degree=3))
        make_face()
    extrude(amount=-CUT_EXTRUDE1_DEPTH, mode=Mode.SUBTRACT)


solid = part.part
